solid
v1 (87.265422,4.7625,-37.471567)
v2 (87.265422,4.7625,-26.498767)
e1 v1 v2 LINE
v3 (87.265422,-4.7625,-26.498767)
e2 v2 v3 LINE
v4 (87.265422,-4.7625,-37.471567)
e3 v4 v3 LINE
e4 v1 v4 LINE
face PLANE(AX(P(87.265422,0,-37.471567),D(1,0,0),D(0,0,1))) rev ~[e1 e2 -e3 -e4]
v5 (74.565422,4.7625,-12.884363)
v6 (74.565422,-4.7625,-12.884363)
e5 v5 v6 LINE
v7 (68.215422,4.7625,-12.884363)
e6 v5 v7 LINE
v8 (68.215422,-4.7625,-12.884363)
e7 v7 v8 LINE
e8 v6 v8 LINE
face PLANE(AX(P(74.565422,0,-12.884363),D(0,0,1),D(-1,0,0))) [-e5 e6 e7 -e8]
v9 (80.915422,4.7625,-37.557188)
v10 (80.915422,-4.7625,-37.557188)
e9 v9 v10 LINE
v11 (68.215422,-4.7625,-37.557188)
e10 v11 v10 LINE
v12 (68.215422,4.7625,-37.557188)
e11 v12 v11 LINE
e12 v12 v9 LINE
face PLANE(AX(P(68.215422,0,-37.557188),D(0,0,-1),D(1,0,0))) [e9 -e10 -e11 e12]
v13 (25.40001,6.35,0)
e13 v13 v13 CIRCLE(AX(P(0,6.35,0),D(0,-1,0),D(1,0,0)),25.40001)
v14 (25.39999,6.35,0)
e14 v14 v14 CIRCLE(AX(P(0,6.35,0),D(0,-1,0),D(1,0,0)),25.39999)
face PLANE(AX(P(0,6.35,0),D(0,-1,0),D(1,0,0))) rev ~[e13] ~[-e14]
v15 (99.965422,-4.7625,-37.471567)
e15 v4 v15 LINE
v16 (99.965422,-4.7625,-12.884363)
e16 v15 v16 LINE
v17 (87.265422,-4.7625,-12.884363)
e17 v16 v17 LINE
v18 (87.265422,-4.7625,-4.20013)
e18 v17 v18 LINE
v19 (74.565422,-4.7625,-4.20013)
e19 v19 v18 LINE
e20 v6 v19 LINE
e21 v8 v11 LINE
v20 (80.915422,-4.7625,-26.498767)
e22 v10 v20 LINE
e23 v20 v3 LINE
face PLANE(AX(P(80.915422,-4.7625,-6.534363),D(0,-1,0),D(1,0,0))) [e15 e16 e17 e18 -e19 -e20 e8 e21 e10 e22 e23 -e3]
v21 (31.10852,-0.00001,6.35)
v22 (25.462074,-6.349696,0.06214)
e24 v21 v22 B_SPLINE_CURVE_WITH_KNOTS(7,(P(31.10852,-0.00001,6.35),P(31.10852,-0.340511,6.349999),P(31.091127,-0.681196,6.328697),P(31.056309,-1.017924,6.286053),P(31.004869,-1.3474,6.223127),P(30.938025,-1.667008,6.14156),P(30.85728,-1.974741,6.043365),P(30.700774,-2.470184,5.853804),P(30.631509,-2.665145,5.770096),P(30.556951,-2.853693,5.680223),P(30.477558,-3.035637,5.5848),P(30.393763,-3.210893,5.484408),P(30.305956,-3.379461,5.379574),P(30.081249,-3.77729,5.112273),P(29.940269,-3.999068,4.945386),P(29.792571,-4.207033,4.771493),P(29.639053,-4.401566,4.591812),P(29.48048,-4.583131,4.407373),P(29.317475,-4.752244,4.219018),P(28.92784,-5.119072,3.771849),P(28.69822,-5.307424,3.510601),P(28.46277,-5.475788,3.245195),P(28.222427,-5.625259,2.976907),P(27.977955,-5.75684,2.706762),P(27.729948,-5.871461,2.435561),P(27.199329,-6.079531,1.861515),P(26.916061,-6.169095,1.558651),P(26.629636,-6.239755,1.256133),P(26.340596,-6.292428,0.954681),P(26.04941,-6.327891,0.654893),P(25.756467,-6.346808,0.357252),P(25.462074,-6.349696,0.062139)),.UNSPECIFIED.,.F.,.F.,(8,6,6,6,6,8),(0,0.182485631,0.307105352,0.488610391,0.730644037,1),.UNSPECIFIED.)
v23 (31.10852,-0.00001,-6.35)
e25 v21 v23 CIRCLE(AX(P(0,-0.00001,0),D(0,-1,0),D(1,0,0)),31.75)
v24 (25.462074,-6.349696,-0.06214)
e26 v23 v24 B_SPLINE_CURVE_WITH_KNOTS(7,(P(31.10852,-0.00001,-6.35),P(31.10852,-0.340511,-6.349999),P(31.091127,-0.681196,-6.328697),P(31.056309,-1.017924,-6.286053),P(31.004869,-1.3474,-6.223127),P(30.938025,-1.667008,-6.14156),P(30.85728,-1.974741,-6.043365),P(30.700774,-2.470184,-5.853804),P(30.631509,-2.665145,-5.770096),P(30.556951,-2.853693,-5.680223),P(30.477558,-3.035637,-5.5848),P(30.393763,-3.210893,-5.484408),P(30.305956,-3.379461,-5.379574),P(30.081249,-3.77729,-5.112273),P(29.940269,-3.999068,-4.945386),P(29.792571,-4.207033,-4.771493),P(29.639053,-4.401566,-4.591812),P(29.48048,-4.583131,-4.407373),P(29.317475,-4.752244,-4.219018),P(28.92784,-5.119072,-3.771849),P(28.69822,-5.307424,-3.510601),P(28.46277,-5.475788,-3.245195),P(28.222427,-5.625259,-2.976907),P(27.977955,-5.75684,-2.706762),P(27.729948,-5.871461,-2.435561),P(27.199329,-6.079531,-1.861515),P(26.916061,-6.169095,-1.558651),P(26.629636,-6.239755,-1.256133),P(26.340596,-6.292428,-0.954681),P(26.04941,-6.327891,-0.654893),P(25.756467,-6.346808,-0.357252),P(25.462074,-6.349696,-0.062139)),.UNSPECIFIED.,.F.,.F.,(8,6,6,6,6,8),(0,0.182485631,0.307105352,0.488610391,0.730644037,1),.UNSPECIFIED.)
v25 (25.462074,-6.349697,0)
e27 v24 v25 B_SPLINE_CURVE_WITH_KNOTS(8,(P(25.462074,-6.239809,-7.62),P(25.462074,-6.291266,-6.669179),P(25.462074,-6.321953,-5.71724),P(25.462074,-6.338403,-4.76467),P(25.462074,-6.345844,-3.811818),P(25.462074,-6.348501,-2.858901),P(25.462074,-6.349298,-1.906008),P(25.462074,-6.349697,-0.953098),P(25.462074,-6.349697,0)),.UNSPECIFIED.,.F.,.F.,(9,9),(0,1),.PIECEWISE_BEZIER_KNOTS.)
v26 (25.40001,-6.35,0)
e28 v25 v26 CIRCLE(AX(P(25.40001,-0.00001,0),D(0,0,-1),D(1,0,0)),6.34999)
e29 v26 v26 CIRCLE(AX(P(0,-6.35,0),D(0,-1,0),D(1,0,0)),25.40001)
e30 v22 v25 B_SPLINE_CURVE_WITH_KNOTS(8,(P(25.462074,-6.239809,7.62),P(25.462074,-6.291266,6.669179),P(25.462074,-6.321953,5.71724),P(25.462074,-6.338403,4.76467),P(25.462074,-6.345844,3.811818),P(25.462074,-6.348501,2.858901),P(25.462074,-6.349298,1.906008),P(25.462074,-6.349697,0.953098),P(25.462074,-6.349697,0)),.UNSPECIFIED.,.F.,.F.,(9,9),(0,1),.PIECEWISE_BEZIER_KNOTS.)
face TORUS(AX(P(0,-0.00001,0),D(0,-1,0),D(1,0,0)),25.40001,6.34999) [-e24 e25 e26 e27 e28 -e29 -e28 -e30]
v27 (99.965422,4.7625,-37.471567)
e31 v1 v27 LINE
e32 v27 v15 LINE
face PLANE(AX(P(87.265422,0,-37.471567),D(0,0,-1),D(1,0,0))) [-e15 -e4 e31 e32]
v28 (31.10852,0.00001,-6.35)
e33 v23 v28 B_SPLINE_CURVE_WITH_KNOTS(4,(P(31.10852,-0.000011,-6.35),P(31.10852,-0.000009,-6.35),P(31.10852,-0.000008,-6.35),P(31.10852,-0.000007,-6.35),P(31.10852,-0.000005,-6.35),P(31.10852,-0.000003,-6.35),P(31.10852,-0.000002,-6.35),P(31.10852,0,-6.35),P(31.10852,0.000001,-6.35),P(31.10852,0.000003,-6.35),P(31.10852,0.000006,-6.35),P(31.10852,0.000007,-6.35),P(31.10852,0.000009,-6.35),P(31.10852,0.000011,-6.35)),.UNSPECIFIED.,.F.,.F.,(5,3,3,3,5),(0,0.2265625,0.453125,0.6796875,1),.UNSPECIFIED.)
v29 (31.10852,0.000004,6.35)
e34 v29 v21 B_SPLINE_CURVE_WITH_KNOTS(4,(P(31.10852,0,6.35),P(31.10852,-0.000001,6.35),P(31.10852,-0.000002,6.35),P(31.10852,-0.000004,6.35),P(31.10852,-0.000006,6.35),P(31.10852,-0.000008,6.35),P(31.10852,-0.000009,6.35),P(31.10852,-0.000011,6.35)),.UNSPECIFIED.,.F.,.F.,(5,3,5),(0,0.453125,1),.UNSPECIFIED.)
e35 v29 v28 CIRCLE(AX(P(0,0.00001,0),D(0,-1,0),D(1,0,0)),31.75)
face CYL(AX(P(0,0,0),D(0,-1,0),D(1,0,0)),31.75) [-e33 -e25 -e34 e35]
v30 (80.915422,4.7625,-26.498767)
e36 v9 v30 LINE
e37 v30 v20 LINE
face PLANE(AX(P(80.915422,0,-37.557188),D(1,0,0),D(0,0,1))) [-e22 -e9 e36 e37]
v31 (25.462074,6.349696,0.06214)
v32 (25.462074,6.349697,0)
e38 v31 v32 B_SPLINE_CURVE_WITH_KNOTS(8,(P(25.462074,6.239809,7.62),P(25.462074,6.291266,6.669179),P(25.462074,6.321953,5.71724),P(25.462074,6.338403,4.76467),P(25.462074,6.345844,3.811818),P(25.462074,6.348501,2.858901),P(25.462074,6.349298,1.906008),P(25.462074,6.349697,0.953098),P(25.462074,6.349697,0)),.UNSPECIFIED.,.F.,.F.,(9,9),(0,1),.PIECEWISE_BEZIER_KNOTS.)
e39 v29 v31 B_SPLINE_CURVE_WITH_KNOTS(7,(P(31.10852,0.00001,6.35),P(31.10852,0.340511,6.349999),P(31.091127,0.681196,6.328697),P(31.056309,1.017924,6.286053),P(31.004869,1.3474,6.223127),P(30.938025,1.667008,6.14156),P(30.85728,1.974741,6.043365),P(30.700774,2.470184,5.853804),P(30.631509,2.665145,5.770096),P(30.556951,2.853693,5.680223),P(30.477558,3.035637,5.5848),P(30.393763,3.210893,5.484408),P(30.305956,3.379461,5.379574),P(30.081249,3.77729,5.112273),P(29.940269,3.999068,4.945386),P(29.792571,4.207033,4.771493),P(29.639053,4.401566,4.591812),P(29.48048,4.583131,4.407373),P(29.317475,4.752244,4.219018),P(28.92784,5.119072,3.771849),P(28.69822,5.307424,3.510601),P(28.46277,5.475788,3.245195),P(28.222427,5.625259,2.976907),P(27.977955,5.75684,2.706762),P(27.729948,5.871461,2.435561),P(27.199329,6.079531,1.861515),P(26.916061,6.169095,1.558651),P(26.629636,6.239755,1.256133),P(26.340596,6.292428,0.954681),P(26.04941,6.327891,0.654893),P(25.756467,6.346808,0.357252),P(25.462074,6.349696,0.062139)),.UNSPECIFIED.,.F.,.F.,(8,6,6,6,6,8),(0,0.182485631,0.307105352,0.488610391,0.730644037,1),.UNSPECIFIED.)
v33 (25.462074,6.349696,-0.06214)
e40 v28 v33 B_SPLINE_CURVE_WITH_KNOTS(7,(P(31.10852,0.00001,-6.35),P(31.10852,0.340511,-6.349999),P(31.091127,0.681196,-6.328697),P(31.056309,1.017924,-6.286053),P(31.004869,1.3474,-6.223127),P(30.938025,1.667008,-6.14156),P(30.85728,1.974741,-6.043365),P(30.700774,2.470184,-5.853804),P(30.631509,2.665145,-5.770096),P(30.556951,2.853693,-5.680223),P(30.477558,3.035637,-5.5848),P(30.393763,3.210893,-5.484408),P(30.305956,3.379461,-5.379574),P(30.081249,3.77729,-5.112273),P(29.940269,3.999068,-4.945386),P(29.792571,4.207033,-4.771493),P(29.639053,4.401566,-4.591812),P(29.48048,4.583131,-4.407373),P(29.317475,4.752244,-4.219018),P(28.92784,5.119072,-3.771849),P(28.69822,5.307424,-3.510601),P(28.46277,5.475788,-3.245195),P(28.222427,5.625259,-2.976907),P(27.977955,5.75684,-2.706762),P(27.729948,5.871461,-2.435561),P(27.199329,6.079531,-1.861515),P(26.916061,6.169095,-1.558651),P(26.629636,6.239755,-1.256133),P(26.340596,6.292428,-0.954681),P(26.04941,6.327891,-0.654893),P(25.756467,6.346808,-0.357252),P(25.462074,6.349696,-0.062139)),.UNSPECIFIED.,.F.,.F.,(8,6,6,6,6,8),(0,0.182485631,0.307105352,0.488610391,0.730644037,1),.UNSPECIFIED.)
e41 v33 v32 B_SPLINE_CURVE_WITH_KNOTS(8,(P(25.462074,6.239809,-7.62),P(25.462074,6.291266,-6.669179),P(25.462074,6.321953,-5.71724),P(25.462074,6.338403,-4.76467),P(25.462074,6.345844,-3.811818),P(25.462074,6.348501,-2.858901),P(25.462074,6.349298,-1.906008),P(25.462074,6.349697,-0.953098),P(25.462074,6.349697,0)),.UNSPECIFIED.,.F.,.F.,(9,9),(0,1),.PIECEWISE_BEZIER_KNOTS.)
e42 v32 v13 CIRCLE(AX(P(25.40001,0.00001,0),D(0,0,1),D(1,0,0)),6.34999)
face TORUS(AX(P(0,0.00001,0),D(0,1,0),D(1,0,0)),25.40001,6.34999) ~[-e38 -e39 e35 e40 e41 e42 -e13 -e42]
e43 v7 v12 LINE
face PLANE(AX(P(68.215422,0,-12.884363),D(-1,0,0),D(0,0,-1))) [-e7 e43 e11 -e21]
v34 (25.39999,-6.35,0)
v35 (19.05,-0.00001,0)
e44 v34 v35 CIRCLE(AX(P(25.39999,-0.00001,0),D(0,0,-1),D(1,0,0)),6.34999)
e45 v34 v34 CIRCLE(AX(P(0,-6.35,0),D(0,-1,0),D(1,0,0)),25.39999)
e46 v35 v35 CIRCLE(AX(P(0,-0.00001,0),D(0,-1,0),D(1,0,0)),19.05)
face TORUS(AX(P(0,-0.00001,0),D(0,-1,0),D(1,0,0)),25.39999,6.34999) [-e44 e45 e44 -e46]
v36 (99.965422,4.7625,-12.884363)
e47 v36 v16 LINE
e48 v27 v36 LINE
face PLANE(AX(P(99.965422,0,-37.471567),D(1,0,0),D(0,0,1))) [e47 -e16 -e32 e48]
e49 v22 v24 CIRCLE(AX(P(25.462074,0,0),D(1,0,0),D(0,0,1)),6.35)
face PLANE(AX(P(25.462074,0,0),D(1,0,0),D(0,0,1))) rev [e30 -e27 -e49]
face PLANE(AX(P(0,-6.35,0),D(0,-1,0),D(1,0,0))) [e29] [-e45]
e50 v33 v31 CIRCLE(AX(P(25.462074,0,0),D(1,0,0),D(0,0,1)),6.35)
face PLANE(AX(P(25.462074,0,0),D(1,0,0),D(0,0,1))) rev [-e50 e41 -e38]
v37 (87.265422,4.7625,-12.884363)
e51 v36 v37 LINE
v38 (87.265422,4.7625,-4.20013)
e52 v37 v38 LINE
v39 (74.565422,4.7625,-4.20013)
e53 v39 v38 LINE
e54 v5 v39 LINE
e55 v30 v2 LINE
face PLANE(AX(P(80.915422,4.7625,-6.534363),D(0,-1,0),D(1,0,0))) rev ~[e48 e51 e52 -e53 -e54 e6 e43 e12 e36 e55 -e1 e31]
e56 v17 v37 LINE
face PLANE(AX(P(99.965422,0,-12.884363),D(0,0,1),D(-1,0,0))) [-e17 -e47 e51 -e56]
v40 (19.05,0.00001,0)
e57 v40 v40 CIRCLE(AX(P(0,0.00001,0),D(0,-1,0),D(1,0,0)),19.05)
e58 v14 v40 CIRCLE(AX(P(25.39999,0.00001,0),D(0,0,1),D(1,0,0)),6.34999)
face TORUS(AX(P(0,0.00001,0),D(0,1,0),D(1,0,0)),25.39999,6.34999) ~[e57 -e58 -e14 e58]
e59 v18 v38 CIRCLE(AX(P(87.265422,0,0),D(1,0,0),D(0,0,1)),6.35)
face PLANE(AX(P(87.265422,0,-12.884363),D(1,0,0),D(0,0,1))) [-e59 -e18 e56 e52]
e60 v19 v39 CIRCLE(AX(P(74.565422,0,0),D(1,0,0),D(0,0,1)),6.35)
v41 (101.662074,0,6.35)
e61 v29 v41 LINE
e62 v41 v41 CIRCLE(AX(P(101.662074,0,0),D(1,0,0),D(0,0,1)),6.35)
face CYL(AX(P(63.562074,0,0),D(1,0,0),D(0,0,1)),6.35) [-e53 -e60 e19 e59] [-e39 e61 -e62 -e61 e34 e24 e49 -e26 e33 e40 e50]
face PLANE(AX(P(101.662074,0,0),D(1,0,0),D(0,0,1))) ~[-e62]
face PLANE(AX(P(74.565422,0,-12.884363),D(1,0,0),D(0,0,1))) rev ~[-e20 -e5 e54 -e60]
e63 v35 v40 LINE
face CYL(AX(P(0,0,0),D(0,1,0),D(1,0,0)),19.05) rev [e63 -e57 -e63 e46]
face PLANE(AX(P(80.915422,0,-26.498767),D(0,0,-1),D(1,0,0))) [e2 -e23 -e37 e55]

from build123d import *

# Parameters (mm, degrees)
F0_R     = 31.75
F0_R_2   = 19.05
F1_DEPTH = 6.35
F2_R     = 6.34999
F3_R     = 6.34999
F4_W     = 76.2
F4_H     = 6.35
F6_W     = 12.7
F6_H     = 12.7
F6_H_2   = 10.9727999343
F7_DEPTH = 4.7625


# Not quite as in the source:
# - a fillet or chamfer is up to 0.001 mm smaller than in the source, because OpenCascade refuses the exact size


with BuildPart() as f1:
    # F0 (on Front) → F1 (new body, symmetric)
    with BuildSketch(Plane.XZ):
        Circle(F0_R)
        Circle(F0_R_2, mode=Mode.SUBTRACT)
    extrude(amount=F1_DEPTH, both=True)

    # F2 (radius 6.35 in the source; OpenCascade refuses exactly that, so slightly less here)
    f2_edges = [f1.edges().sort_by_distance(p)[0] for p in [
        (-31.75, -6.35, 0),
        (-31.75, 6.35, 0),
    ]]
    fillet(f2_edges, radius=F2_R)

    # F3 (radius 6.35 in the source; OpenCascade refuses exactly that, so slightly less here)
    f3_edges = [f1.edges().sort_by_distance(p)[0] for p in [
        (-19.05, -6.35, 0),
        (-19.05, 6.35, 0),
    ]]
    fillet(f3_edges, radius=F3_R)

    # F4 (on Front) → F5 (revolve)
    with BuildSketch(Plane.XZ):
        with Locations((63.5620742053, 3.175)):
            Rectangle(F4_W, F4_H)
    revolve(axis=Axis((63.5620742053, 0, 0), (1, 0, 0)))

    # F6 (on Front) → F7 (join, symmetric)
    with BuildSketch(Plane.XZ):
        with Locations((80.9154223323, -6.5343625903)):
            Rectangle(F6_W, F6_H)
        Polygon((87.2654223323, -12.8843625903), (74.5654223323, -12.8843625903), (68.2154223323, -12.8843625903), (68.2154223323, -26.4987673753), (74.5654223323, -26.4987673753), (80.9154223323, -26.4987673753), (87.2654223323, -26.4987673753), (99.9654223323, -26.4987673753), (99.9654223323, -12.8843625903), align=None)
        Polygon((74.5654223323, -26.4987673753), (68.2154223323, -26.4987673753), (68.2154223323, -37.5571879506), (80.9154223323, -37.5571879506), (80.9154223323, -26.4987673753), align=None)
        with Locations((93.6154223323, -31.9851673424)):
            Rectangle(F6_W, F6_H_2)
    extrude(amount=F7_DEPTH, both=True)


solid = f1.part
